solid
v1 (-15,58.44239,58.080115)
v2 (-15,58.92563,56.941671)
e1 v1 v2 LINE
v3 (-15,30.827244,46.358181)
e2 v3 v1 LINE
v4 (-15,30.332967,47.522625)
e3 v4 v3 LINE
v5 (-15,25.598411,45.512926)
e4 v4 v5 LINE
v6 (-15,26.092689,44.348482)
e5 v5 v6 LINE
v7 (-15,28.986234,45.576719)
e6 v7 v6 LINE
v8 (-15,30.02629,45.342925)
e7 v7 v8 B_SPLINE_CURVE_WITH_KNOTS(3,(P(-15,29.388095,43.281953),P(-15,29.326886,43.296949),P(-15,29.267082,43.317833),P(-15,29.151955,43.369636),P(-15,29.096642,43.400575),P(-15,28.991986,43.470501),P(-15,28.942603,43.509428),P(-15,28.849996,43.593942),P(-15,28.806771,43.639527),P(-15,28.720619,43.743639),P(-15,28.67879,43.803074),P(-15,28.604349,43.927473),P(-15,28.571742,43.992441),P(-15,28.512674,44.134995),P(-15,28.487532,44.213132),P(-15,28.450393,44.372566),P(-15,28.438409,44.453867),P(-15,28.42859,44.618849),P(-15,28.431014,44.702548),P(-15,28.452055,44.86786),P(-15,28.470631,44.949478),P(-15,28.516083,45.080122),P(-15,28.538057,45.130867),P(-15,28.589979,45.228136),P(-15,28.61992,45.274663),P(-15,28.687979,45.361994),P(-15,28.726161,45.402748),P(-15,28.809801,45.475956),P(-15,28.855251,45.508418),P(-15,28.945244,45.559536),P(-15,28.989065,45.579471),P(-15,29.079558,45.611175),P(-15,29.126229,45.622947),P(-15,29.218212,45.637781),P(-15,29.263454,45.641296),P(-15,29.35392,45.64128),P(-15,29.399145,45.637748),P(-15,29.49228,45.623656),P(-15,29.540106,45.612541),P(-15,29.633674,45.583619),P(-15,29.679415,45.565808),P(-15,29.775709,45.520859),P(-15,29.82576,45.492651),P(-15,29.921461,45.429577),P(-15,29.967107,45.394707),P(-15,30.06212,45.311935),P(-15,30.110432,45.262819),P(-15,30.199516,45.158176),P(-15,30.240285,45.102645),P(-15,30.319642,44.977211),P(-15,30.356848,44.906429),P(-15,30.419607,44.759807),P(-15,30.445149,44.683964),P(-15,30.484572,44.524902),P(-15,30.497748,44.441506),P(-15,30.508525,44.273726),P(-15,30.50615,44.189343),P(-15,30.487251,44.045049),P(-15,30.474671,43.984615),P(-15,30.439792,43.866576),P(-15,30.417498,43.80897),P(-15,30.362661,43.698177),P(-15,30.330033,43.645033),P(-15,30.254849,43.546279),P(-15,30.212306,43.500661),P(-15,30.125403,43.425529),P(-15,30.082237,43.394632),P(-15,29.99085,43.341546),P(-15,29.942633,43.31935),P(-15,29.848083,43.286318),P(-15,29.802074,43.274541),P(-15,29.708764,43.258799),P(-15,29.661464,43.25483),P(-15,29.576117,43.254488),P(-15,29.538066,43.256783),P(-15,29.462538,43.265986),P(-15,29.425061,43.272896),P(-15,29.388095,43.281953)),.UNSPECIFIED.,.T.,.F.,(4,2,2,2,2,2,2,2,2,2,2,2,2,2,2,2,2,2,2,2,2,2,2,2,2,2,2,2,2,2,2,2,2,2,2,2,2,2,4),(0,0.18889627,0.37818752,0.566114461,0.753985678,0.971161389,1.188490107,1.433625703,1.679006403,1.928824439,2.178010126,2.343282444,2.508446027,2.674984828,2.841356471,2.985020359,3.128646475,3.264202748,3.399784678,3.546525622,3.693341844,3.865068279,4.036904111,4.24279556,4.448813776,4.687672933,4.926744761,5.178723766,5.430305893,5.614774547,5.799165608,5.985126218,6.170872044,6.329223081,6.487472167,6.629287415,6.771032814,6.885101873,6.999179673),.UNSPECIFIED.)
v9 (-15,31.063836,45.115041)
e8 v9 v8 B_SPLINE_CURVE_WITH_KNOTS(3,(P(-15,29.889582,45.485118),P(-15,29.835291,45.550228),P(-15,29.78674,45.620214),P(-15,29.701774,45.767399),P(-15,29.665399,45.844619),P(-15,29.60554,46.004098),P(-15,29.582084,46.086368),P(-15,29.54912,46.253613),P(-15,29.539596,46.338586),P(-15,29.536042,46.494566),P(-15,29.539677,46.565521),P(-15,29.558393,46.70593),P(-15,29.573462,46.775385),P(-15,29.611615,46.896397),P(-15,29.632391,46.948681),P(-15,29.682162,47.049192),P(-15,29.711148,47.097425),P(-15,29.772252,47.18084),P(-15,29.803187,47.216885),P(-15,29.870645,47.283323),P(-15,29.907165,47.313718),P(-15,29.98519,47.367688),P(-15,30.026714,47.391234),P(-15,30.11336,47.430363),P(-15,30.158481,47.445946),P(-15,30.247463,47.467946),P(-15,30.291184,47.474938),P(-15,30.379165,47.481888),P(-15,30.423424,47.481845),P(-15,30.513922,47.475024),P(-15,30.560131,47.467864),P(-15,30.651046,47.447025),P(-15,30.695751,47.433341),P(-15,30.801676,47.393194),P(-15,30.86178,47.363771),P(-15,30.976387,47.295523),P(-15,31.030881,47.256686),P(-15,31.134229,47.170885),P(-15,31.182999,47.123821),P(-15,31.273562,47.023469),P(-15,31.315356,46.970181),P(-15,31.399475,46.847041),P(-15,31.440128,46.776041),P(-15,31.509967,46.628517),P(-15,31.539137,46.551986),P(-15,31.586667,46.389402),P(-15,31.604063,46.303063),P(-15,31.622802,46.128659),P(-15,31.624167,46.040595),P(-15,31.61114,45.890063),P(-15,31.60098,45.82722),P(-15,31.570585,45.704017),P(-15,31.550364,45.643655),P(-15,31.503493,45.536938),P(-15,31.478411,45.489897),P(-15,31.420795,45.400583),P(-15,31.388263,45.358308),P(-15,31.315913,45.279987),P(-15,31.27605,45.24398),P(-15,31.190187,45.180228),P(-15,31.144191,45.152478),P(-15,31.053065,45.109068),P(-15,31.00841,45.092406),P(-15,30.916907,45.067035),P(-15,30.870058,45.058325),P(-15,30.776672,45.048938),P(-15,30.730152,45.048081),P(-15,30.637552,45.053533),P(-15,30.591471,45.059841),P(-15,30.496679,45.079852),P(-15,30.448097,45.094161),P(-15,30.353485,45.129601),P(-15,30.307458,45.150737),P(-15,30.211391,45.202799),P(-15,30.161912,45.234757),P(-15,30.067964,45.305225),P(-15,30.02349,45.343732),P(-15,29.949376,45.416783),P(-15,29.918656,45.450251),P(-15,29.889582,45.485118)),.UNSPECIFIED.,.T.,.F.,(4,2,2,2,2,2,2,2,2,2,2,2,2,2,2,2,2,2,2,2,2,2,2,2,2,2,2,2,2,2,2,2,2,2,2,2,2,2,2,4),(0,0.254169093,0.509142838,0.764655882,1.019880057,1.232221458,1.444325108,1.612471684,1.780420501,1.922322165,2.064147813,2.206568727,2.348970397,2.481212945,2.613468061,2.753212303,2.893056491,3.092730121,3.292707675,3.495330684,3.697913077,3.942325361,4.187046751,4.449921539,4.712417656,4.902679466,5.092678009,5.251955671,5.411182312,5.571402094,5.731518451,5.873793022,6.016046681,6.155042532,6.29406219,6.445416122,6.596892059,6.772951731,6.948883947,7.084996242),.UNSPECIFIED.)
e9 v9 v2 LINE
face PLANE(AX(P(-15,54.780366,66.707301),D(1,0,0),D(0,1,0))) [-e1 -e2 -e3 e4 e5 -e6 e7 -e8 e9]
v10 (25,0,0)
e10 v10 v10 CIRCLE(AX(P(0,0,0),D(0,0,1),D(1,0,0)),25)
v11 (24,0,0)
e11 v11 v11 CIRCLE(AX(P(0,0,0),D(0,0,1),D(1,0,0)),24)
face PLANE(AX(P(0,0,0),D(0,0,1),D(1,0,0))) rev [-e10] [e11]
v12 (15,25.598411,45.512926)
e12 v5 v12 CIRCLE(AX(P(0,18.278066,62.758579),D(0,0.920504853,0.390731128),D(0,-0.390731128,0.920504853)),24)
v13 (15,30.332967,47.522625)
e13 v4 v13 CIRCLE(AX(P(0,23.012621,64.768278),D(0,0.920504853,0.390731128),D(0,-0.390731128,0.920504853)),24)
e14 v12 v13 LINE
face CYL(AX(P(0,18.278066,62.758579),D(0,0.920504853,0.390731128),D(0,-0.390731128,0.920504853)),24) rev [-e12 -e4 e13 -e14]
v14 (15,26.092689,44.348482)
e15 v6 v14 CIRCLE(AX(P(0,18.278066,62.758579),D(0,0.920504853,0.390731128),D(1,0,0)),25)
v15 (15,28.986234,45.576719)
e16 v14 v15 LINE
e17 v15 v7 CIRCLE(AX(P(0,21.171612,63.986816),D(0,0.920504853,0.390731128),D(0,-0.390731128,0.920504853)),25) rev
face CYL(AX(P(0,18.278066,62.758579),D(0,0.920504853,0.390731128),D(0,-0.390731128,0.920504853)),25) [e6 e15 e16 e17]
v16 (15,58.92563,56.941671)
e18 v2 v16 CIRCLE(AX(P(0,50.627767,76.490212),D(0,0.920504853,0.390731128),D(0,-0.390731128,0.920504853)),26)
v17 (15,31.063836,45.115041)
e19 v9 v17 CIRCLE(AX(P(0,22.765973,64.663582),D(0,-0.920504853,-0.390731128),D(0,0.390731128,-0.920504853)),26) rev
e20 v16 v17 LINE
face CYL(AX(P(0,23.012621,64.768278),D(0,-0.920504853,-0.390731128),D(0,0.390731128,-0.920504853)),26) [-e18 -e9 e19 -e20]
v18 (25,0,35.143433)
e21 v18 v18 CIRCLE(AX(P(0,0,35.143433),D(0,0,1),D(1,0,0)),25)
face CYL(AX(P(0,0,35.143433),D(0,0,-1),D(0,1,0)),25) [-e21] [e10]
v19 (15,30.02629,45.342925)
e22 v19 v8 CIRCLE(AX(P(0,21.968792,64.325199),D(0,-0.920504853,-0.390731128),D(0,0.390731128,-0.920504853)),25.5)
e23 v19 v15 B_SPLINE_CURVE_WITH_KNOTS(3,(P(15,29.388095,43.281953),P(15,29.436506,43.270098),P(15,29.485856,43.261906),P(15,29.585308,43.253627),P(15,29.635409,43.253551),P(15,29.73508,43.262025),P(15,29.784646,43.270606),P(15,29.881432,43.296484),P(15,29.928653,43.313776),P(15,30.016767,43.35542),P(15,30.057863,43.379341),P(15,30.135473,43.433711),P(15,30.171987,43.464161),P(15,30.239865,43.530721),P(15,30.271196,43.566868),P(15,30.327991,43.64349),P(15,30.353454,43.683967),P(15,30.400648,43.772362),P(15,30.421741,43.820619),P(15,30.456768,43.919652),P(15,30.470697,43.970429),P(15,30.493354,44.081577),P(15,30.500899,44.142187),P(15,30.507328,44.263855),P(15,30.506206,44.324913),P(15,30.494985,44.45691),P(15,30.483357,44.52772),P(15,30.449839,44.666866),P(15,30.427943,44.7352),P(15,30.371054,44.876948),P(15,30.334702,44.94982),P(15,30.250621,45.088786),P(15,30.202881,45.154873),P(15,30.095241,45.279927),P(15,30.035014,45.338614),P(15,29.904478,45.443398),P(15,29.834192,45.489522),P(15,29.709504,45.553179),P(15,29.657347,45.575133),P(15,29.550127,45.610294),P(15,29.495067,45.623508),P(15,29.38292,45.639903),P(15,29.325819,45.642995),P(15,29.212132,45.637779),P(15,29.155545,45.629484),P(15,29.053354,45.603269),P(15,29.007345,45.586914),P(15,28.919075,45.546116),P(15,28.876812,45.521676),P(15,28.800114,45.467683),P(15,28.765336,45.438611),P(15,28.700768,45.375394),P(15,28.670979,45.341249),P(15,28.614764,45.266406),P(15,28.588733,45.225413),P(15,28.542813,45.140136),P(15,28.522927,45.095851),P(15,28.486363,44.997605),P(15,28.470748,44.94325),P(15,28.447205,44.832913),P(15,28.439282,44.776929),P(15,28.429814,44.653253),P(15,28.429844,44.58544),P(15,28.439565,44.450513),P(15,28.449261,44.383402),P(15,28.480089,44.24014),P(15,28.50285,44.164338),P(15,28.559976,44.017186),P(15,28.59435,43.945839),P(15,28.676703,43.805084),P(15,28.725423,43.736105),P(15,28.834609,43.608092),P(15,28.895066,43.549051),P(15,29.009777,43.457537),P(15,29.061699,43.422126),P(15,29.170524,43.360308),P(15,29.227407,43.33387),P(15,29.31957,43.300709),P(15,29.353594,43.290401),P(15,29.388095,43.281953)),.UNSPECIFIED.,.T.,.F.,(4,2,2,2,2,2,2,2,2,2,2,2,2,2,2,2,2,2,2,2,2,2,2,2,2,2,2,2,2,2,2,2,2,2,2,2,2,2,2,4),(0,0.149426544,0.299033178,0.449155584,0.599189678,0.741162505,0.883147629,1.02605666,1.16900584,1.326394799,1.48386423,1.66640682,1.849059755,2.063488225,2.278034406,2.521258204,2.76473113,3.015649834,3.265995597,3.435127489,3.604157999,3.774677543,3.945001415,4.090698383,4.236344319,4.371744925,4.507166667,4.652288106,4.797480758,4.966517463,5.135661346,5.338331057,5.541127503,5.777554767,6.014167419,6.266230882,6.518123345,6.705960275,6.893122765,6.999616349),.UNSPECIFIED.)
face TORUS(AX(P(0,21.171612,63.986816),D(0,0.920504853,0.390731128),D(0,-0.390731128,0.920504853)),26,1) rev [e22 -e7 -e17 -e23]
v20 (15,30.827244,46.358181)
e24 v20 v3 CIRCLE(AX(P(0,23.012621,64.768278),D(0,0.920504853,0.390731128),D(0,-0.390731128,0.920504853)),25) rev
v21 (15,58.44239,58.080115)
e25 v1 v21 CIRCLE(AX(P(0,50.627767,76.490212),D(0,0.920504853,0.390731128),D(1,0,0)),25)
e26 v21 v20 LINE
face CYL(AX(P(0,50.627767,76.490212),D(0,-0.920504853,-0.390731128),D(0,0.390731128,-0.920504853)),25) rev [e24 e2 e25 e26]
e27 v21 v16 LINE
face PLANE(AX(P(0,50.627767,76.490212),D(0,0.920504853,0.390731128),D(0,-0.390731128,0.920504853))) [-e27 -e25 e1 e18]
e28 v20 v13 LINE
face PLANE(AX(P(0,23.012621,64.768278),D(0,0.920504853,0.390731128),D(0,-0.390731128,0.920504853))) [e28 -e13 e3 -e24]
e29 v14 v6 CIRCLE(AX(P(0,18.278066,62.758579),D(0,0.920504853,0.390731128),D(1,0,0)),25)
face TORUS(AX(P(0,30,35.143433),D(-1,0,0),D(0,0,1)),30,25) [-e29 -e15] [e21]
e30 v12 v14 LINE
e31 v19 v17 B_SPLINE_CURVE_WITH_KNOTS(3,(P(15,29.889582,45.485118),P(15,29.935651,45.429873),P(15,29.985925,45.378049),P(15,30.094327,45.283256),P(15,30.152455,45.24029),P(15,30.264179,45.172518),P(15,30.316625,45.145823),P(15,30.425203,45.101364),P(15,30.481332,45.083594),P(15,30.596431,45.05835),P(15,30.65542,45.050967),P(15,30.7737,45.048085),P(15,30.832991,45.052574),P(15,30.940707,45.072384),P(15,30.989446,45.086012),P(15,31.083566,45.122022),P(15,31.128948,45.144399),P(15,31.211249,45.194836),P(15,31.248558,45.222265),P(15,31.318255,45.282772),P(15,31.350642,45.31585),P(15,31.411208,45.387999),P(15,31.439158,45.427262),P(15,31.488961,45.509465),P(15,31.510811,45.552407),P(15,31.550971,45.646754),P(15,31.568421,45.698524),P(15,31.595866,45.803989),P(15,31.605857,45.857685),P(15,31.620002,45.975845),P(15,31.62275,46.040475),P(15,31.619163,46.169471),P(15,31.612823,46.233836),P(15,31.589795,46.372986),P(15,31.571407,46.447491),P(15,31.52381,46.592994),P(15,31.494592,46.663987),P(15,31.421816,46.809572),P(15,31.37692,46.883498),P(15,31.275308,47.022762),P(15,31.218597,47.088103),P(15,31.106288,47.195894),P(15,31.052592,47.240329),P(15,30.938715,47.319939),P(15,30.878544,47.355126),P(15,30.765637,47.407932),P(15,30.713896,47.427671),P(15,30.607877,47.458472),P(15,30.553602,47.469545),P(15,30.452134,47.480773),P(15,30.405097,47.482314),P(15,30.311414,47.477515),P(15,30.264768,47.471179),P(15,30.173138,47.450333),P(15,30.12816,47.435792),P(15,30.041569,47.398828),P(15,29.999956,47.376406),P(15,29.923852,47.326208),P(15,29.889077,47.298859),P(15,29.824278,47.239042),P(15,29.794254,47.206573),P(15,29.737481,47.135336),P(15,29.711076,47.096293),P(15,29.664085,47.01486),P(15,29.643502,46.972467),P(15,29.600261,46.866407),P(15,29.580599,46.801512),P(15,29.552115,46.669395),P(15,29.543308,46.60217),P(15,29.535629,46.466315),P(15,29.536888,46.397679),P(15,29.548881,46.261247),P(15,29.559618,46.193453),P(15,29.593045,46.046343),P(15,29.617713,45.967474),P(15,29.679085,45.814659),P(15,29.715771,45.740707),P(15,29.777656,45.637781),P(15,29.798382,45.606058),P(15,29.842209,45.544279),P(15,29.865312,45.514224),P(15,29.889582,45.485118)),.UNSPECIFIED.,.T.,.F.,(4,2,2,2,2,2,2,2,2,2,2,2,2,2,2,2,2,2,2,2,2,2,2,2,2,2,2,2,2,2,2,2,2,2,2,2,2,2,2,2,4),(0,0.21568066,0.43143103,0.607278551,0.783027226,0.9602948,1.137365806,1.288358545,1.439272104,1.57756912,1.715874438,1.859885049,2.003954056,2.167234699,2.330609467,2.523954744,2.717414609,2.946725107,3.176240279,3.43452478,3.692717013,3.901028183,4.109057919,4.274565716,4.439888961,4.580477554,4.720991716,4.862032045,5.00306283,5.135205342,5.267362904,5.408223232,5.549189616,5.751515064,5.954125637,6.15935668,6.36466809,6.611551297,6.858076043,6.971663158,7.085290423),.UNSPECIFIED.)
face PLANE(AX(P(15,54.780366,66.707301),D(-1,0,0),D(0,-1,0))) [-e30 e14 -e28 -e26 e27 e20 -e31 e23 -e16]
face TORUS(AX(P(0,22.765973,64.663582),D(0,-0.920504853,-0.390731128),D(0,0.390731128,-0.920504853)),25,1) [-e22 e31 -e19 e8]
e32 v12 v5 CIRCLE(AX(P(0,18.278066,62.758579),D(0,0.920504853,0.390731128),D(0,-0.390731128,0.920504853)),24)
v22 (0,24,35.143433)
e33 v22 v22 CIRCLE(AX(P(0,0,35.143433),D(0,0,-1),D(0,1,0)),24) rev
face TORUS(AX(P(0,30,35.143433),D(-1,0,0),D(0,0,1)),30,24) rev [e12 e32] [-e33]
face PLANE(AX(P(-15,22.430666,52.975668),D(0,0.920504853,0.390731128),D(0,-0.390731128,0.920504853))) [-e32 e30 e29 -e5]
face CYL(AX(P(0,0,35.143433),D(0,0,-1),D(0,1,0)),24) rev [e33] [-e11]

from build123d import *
from build123d.topology import SkipClean

# Parameters (mm, degrees)
ESQUISSE6_R             = 25
ESQUISSE6_R_2           = 24
ESQUISSE8_R             = 26
ESQUISSE8_R_2           = 24
EXTRU_MINCE1_DEPTH      = 1
EXTRU_MINCE2_START      = 30
ESQUISSE9_R             = 26
ESQUISSE9_R_2           = 25
EXTRU_MINCE2_DEPTH      = 30
CONG_1_R                = 1
CONG_2_R                = 1
ENL_V_MAT_EXTRU_1_DEPTH = 40


with BuildPart() as part:
    # Balayage-Mince2: sweep along a path in Esquisse7
    with BuildLine(Plane(origin=(0, 0, 0), x_dir=(0, 0, -1), z_dir=(1, 0, 0))) as balayage_mince2_path:
        Line((0, 0), (-35.14343316412919, -3.47e-15))
        ThreePointArc((-35.14343316412919, -3.47e-15), (-51.70154272349097, 4.983425337984965), (-62.75857876770245, 18.27806614532184))
        Line((-62.75857876770245, 18.27806614532184), (-64.37754708374251, 22.092116482858586))
    # Esquisse6 → Balayage-Mince2 (sweep)
    with BuildSketch(Plane.XY):
        Circle(ESQUISSE6_R)
        Circle(ESQUISSE6_R_2, mode=Mode.SUBTRACT)
    sweep(path=balayage_mince2_path.line)



with BuildPart() as body_2:
    # Esquisse8 → Extru.-Mince1 (new body)
    with BuildSketch(Plane(origin=(0, 41.87396099217143, 17.77444189612002), x_dir=(1, 0, 0), z_dir=(0, 0.9205048534524412, 0.39073112848927183))):
        with Locations((0, -50.62776693988426)):
            Circle(ESQUISSE8_R)
        with Locations((0, -50.62776693988426)):
            Circle(ESQUISSE8_R_2, mode=Mode.SUBTRACT)
    extrude(amount=EXTRU_MINCE1_DEPTH)


with BuildPart() as part_1:
    add(part.part)

    add(body_2.part)  # Extru.-Mince2 merges body 2
    # Esquisse9 → Extru.-Mince2 (add)
    with BuildSketch(Plane(origin=(0, 42.794465845623876, 18.16517302460929), x_dir=(1, 0, 0), z_dir=(0, 0.9205048534524412, 0.39073112848927183)).offset(EXTRU_MINCE2_START)):
        with Locations((0, -50.627766939884246)):
            Circle(ESQUISSE9_R)
        with Locations((0, -50.627766939884246)):
            Circle(ESQUISSE9_R_2, mode=Mode.SUBTRACT)
    extrude(amount=-EXTRU_MINCE2_DEPTH)

    # Congé1
    cong_1_edges = [part_1.edges().sort_by_distance(p)[0] for p in [
        (-25, 22.09211648285859, 64.3775470837425),
    ]]
    fillet(cong_1_edges, radius=CONG_1_R - 0.0001)  # a hair under: the kernel refuses the full size

    # Congé2
    cong_2_edges = [part_1.edges().sort_by_distance(p)[0] for p in [
        (-26, 22.092116482858604, 64.37754708374253),
    ]]
    fillet(cong_2_edges, radius=CONG_2_R)

    # Esquisse12 → Enlèv. mat.-Extru.1 (cut)
    with SkipClean():  # the faces are left unmerged after this step: merging them gives an invalid solid
        with BuildSketch(Plane(origin=(0, 0, 0), x_dir=(1, 0, 0), z_dir=(0, -0.39073112848927455, 0.9205048534524399))):
            Polygon((-15, 76.49021206691012), (15, 76.49021206691012), (15.000000000000004, 41.34677890278088), (-14.999999999999996, 41.34677890278088), align=None)
        extrude(amount=ENL_V_MAT_EXTRU_1_DEPTH, mode=Mode.SUBTRACT)


solid = part_1.part
